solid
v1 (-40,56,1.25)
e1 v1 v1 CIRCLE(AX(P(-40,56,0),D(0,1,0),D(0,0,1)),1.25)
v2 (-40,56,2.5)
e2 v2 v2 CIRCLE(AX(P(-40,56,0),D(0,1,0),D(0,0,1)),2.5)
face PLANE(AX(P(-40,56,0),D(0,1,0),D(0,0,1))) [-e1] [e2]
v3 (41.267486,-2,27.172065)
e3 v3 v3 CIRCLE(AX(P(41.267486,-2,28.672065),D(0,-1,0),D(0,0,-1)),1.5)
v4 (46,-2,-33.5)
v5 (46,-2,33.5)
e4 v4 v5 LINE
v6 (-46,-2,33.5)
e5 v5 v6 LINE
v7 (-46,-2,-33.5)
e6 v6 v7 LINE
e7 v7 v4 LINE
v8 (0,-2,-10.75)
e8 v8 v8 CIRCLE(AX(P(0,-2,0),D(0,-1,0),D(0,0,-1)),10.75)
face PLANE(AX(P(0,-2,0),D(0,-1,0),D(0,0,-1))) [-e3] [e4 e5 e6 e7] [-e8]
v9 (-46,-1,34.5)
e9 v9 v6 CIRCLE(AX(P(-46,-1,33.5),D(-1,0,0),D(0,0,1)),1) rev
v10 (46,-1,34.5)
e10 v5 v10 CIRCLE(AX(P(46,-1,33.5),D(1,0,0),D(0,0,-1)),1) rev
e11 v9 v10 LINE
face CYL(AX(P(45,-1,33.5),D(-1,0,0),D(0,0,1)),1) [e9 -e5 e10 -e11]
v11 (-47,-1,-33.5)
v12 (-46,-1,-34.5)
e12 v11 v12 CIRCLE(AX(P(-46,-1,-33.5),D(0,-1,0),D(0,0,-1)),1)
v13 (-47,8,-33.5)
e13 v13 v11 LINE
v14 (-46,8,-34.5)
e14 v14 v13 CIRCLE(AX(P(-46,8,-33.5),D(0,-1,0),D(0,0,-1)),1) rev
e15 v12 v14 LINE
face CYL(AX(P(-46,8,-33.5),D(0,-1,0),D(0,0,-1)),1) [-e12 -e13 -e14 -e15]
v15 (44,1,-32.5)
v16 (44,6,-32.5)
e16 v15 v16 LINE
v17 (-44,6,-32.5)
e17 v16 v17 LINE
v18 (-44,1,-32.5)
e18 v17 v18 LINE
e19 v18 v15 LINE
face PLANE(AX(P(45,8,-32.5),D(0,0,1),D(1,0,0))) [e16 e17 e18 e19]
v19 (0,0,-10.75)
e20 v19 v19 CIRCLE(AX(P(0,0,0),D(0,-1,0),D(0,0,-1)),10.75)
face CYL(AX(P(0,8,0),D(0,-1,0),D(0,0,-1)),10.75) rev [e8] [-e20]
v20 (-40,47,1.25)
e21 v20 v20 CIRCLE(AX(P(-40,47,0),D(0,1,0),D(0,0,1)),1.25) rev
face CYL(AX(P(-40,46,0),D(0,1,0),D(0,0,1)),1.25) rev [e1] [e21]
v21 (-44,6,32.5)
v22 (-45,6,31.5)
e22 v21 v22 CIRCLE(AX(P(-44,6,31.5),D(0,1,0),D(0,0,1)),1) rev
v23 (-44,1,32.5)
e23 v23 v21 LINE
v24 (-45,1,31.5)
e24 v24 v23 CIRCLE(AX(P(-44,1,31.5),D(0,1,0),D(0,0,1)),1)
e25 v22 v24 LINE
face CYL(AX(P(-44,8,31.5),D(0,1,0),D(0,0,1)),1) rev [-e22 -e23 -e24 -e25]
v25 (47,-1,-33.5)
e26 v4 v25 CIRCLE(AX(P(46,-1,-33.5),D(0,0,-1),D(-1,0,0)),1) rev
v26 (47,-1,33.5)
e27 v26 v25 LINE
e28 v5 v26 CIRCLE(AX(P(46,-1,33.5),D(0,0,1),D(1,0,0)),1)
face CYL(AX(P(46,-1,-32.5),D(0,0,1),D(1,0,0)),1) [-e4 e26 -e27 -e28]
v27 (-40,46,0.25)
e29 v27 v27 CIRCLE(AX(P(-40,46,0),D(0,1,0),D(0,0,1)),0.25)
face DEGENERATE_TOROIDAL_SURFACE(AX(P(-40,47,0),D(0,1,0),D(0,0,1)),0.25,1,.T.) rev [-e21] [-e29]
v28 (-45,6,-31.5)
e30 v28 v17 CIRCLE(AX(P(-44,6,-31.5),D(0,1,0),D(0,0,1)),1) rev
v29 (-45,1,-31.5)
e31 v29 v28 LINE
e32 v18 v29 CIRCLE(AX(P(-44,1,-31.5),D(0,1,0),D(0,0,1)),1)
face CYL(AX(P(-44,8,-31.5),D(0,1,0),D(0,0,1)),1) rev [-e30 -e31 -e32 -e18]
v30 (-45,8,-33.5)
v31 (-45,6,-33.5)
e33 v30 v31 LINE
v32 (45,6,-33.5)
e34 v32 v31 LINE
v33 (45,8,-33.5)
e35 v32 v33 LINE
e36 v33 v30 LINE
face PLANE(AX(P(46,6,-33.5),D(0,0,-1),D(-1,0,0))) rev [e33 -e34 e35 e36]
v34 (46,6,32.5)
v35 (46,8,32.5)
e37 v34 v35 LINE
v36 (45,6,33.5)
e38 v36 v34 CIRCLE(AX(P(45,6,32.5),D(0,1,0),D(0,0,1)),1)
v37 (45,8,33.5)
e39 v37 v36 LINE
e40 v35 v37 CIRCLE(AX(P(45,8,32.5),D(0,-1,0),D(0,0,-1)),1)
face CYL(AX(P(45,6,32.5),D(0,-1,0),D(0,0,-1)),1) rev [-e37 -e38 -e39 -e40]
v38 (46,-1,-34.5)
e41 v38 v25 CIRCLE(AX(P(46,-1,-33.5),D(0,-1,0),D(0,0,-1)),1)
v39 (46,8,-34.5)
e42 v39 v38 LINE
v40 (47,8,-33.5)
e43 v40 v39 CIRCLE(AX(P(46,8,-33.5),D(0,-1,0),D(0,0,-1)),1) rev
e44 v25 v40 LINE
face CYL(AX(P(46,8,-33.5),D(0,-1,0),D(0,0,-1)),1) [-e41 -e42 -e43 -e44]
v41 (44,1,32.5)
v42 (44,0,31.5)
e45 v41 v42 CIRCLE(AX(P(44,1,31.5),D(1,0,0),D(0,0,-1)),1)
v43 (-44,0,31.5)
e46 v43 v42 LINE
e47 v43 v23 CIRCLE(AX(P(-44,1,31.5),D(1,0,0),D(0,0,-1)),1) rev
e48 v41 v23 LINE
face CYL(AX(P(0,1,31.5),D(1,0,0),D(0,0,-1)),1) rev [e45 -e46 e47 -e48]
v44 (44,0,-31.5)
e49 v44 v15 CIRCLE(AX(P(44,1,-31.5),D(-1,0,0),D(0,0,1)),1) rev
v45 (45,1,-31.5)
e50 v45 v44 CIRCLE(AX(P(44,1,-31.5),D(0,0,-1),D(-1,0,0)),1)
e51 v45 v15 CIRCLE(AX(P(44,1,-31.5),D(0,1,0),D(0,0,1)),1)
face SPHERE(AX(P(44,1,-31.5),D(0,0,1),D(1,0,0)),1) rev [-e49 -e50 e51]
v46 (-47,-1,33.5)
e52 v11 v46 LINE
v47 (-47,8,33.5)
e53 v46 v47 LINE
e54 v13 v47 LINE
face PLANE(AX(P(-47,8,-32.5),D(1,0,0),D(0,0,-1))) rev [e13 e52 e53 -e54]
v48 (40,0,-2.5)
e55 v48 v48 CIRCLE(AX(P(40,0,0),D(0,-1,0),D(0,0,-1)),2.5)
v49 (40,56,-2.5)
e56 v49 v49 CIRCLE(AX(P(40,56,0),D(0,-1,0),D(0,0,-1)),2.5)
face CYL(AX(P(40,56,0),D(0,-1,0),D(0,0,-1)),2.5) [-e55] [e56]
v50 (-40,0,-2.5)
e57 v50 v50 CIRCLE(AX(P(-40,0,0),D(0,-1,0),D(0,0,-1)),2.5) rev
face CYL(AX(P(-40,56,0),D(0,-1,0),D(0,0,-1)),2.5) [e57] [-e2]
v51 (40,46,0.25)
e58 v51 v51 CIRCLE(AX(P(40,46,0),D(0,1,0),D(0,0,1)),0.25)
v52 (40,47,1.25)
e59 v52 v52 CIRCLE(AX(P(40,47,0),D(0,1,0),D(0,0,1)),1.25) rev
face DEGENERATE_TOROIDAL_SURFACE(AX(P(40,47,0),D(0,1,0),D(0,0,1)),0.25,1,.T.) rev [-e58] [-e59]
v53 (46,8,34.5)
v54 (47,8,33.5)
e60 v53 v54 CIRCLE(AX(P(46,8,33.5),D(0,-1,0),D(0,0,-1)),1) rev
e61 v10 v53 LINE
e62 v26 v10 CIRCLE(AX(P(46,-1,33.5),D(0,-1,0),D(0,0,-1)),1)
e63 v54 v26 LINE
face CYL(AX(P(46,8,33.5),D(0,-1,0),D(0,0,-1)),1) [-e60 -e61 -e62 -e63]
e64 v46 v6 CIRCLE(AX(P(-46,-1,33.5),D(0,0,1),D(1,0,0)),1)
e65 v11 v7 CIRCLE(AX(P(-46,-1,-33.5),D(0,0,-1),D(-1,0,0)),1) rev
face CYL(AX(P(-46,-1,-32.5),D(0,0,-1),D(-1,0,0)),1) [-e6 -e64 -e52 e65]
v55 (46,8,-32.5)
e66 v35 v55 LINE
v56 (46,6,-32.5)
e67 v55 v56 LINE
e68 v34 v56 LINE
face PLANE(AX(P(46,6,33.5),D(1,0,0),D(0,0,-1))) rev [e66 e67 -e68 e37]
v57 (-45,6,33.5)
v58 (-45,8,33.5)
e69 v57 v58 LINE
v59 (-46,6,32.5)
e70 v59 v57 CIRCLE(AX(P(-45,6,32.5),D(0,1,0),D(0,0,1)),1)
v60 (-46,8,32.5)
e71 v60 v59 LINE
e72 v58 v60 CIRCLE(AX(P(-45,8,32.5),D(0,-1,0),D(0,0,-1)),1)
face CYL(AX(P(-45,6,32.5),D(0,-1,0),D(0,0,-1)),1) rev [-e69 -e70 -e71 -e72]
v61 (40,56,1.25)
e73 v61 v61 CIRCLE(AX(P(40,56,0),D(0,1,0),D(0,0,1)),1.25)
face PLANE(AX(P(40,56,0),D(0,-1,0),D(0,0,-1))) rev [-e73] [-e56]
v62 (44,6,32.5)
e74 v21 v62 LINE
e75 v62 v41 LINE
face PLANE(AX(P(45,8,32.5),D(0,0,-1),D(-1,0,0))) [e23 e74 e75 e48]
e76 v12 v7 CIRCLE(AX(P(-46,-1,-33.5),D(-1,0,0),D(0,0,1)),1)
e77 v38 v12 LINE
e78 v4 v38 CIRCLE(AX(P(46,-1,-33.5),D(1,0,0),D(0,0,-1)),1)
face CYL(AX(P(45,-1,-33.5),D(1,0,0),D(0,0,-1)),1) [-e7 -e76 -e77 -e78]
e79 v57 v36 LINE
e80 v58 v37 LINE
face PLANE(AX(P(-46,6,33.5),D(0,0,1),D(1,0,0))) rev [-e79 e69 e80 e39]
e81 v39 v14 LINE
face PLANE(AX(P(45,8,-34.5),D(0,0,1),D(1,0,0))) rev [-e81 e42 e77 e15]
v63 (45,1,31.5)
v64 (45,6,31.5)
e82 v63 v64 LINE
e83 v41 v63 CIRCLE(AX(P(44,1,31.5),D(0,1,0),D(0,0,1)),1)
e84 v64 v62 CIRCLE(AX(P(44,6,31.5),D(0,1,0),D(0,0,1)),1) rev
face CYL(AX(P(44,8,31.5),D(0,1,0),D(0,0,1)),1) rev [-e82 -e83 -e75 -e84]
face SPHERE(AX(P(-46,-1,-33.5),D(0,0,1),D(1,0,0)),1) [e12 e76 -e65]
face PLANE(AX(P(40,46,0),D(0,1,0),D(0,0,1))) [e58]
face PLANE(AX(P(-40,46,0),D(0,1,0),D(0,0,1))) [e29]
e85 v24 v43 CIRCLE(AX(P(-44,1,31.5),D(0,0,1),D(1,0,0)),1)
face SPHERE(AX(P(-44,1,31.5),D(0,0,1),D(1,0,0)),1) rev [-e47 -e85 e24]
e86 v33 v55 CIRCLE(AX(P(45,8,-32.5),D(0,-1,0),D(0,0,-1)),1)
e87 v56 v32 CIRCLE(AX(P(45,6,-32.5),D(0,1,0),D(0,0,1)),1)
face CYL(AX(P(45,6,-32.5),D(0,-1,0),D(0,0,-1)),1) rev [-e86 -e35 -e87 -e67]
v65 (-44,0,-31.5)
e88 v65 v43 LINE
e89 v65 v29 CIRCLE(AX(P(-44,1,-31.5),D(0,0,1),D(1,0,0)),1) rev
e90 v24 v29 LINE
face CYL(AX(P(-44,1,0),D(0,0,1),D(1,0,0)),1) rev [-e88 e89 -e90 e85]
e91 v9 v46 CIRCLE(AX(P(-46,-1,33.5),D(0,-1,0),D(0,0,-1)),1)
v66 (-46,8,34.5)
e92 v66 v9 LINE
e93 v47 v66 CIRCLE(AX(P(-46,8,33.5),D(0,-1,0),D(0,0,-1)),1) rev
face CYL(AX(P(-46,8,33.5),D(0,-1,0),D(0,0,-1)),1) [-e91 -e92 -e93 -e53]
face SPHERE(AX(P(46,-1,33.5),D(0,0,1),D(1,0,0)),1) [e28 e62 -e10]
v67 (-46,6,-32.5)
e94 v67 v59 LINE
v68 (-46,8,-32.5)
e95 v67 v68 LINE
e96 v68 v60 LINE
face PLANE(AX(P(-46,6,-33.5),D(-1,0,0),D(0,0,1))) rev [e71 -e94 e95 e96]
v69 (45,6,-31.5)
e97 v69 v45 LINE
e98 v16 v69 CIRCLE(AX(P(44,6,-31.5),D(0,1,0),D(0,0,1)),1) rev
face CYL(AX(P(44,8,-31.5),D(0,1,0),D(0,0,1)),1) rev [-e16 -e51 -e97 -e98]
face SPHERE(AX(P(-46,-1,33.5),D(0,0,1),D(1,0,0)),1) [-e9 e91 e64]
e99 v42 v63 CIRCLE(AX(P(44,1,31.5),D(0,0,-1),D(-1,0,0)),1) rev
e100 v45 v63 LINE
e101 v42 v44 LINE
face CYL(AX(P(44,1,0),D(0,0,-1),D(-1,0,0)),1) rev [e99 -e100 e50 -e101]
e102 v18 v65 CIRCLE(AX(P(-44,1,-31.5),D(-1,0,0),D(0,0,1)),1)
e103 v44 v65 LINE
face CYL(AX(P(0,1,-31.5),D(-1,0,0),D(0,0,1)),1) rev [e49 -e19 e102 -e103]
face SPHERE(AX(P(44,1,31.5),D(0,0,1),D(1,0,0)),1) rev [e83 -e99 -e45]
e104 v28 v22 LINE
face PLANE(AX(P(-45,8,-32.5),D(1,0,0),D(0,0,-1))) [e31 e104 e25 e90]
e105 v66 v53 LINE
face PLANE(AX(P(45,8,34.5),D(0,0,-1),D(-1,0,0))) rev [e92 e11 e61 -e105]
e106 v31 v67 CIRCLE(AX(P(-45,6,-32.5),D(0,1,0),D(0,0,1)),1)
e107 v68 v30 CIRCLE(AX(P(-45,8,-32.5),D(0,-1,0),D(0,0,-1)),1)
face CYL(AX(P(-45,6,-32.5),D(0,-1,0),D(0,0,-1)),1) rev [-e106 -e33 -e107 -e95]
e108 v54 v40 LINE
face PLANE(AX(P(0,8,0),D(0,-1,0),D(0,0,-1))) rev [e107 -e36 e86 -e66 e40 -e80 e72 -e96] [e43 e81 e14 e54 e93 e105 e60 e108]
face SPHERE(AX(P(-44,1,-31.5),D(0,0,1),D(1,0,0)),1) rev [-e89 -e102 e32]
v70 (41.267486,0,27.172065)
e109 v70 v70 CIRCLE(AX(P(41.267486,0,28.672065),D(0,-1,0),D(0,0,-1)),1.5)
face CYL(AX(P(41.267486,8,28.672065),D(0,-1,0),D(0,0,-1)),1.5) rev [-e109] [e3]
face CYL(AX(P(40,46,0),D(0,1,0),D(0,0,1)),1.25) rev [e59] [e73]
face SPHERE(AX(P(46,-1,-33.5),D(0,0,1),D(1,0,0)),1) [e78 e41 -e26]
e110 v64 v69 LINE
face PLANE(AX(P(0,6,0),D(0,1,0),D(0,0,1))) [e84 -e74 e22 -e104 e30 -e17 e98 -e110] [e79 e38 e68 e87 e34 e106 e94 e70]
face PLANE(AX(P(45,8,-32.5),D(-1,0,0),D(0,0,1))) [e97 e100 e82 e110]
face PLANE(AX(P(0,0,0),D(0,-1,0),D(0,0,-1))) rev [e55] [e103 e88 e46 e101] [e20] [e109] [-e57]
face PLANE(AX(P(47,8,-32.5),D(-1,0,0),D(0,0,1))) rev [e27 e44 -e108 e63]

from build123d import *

# Parameters (mm, degrees)
SKETCH1_W           = 90
SKETCH1_H           = 65
BOSS_EXTRUDE1_DEPTH = 8
SHELL1_T            = 2
SKETCH3_W           = 92
SKETCH3_H           = 67
SKETCH3_W_2         = 90
SKETCH3_H_2         = 65
CUT_EXTRUDE1_DEPTH  = 2
FILLET2_R           = 1
FILLET3_R           = 1
FILLET4_R           = 1
SKETCH2_R           = 2.5
BOSS_EXTRUDE2_DEPTH = 56
SKETCH4_R           = 1.25
CUT_EXTRUDE2_DEPTH  = 10
FILLET5_R           = 1
SKETCH5_R           = 10.75
CUT_EXTRUDE3_DEPTH  = 10
SKETCH6_R           = 1.5
CUT_EXTRUDE4_DEPTH  = 10
FILLET6_R           = 1


with BuildPart() as part:
    # Sketch1 → Boss-Extrude1 (new body)
    with BuildSketch(Plane(origin=(0, 0, 0), x_dir=(1, 0, 0), z_dir=(0, 1, 0))):
        Rectangle(SKETCH1_W, SKETCH1_H)
    extrude(amount=BOSS_EXTRUDE1_DEPTH)

    # Shell1
    shell1_openings = [part.faces().sort_by_distance(p)[0] for p in [
        (0, 8, 0),
    ]]
    offset(amount=SHELL1_T, openings=shell1_openings, kind=Kind.INTERSECTION)

    # Sketch3 → Cut-Extrude1 (cut)
    with BuildSketch(Plane(origin=(0, 8, 0), x_dir=(1, 0, 0), z_dir=(0, 1, 0))):
        Rectangle(SKETCH3_W, SKETCH3_H)
        Rectangle(SKETCH3_W_2, SKETCH3_H_2, mode=Mode.SUBTRACT)
    extrude(amount=-CUT_EXTRUDE1_DEPTH, mode=Mode.SUBTRACT)

    # Fillet2
    fillet2_edges = [part.edges().sort_by_distance(p)[0] for p in [
        (46, 7, -33.5),
        (46, 7, 33.5),
        (-46, 7, 33.5),
        (-46, 7, -33.5),
    ]]
    fillet(fillet2_edges, radius=FILLET2_R)

    # Fillet3
    fillet3_edges = [part.edges().sort_by_distance(p)[0] for p in [
        (-45, 0, 0),
        (0, 0, 32.5),
        (45, 0, 0),
        (0, 0, -32.5),
    ]]
    fillet(fillet3_edges, radius=FILLET3_R)

    # Fillet4
    # the kernel refuses this fillet: 1 mm, written as the material it adds along each edge
    with BuildSketch(Plane(origin=(44, 1, 31.5), x_dir=(0, 0, 1), z_dir=(1, 0, 0))) as fillet4_piece_1_section:
        Polygon((0, 0), (FILLET4_R, 0), (FILLET4_R, FILLET4_R), (0, FILLET4_R), align=None)
    fillet4_piece_1 = extrude(amount=FILLET4_R, mode=Mode.PRIVATE)
    fillet4_piece_1 = fillet4_piece_1 - Plane(origin=(44, 1, 31.5), x_dir=(0, 0.7071067811865475, -0.7071067811865475), z_dir=(1, 0, 0)) * Sphere(FILLET4_R, mode=Mode.PRIVATE)
    add(fillet4_piece_1)
    with BuildSketch(Plane(origin=(-44, 1, 31.5), x_dir=(-1, 0, 0), z_dir=(0, 0, 1))) as fillet4_piece_2_section:
        Polygon((0, 0), (FILLET4_R, 0), (FILLET4_R, FILLET4_R), (0, FILLET4_R), align=None)
    fillet4_piece_2 = extrude(amount=FILLET4_R, mode=Mode.PRIVATE)
    fillet4_piece_2 = fillet4_piece_2 - Plane(origin=(-44, 1, 31.5), x_dir=(0.7071067811865475, 0.7071067811865475, 0), z_dir=(0, 0, 1)) * Sphere(FILLET4_R, mode=Mode.PRIVATE)
    add(fillet4_piece_2)
    with BuildSketch(Plane(origin=(44, 1, -31.5), x_dir=(0, 0, -1), z_dir=(1, 0, 0))) as fillet4_piece_3_section:
        Polygon((0, 0), (FILLET4_R, 0), (FILLET4_R, -FILLET4_R), (0, -FILLET4_R), align=None)
    fillet4_piece_3 = extrude(amount=FILLET4_R, mode=Mode.PRIVATE)
    fillet4_piece_3 = fillet4_piece_3 - Plane(origin=(44, 1, -31.5), x_dir=(0, 0.7071067811865475, 0.7071067811865475), z_dir=(1, 0, 0)) * Sphere(FILLET4_R, mode=Mode.PRIVATE)
    add(fillet4_piece_3)
    with BuildSketch(Plane(origin=(-44, 1, -31.5), x_dir=(-1, 0, 0), z_dir=(0, 0, -1))) as fillet4_piece_4_section:
        Polygon((0, 0), (FILLET4_R, 0), (FILLET4_R, -FILLET4_R), (0, -FILLET4_R), align=None)
    fillet4_piece_4 = extrude(amount=FILLET4_R, mode=Mode.PRIVATE)
    fillet4_piece_4 = fillet4_piece_4 - Plane(origin=(-44, 1, -31.5), x_dir=(0.7071067811865475, 0.7071067811865475, 0), z_dir=(0, 0, -1)) * Sphere(FILLET4_R, mode=Mode.PRIVATE)
    add(fillet4_piece_4)
    with BuildSketch(Plane(origin=(45, 1, -32.5), x_dir=(0, 0, 1), z_dir=(0, 1, 0)), Plane(origin=(-45, 1, -32.5), x_dir=(1, 0, 0), z_dir=(0, 1, 0))) as fillet4_piece_5:
        with BuildLine():
            CenterArc((FILLET4_R, -FILLET4_R), FILLET4_R, 90, 90)
            Line((0, -FILLET4_R), (0, 0))
            Line((0, 0), (FILLET4_R, 0))
        make_face()
    extrude(amount=5)
    with BuildSketch(Plane(origin=(45, 1, 32.5), x_dir=(0, 0, -1), z_dir=(0, 1, 0)), Plane(origin=(-45, 1, 32.5), x_dir=(1, 0, 0), z_dir=(0, 1, 0))) as fillet4_piece_6:
        with BuildLine():
            CenterArc((FILLET4_R, FILLET4_R), FILLET4_R, 180, 90)
            Line((0, FILLET4_R), (0, 0))
            Line((0, 0), (FILLET4_R, 0))
        make_face()
    extrude(amount=5)

    # Sketch2 → Boss-Extrude2 (add)
    with BuildSketch(Plane(origin=(0, 0, 0), x_dir=(1, 0, 0), z_dir=(0, 1, 0))):
        with Locations(Location((-40, 0, 0), (0, 0, 90))):
            Circle(SKETCH2_R)
        with Locations(Location((40, 0, 0), (0, 0, 90))):
            Circle(SKETCH2_R)
    extrude(amount=BOSS_EXTRUDE2_DEPTH)

    # Sketch4 → Cut-Extrude2 (cut)
    with BuildSketch(Plane(origin=(0, 56, 0), x_dir=(1, 0, 0), z_dir=(0, 1, 0))):
        with Locations(Location((40, 0, 0), (0, 0, 270))):
            Circle(SKETCH4_R)
        with Locations(Location((-40, 0, 0), (0, 0, 270))):
            Circle(SKETCH4_R)
    extrude(amount=-CUT_EXTRUDE2_DEPTH, mode=Mode.SUBTRACT)

    # Fillet5
    fillet5_edges = [part.edges().sort_by_distance(p)[0] for p in [
        (40, 46, -1.25),
        (-40, 46, -1.25),
    ]]
    fillet(fillet5_edges, radius=FILLET5_R)

    # Sketch5 → Cut-Extrude3 (cut)
    with BuildSketch(Plane(origin=(0, -2, 0), x_dir=(-1, 0, 0), z_dir=(0, -1, 0))):
        with Locations(Location((0, 0, 0), (0, 0, 90))):
            Circle(SKETCH5_R)
    extrude(amount=-CUT_EXTRUDE3_DEPTH, mode=Mode.SUBTRACT)

    # Sketch6 → Cut-Extrude4 (cut)
    with BuildSketch(Plane(origin=(0, -2, 0), x_dir=(-1, 0, 0), z_dir=(0, -1, 0))):
        with Locations(Location((-41.26748628, -28.672065144, 0), (0, 0, 90))):
            Circle(SKETCH6_R)
    extrude(amount=-CUT_EXTRUDE4_DEPTH, mode=Mode.SUBTRACT)

    # Fillet6
    fillet6_edges = [part.edges().sort_by_distance(p)[0] for p in [
        (0, -2, -34.5),
        (47, -2, 0),
        (0, -2, 34.5),
        (-47, -2, 0),
        (-47, 3, -34.5),
        (47, 3, -34.5),
        (47, 3, 34.5),
        (-47, 3, 34.5),
    ]]
    fillet(fillet6_edges, radius=FILLET6_R)


solid = part.part
